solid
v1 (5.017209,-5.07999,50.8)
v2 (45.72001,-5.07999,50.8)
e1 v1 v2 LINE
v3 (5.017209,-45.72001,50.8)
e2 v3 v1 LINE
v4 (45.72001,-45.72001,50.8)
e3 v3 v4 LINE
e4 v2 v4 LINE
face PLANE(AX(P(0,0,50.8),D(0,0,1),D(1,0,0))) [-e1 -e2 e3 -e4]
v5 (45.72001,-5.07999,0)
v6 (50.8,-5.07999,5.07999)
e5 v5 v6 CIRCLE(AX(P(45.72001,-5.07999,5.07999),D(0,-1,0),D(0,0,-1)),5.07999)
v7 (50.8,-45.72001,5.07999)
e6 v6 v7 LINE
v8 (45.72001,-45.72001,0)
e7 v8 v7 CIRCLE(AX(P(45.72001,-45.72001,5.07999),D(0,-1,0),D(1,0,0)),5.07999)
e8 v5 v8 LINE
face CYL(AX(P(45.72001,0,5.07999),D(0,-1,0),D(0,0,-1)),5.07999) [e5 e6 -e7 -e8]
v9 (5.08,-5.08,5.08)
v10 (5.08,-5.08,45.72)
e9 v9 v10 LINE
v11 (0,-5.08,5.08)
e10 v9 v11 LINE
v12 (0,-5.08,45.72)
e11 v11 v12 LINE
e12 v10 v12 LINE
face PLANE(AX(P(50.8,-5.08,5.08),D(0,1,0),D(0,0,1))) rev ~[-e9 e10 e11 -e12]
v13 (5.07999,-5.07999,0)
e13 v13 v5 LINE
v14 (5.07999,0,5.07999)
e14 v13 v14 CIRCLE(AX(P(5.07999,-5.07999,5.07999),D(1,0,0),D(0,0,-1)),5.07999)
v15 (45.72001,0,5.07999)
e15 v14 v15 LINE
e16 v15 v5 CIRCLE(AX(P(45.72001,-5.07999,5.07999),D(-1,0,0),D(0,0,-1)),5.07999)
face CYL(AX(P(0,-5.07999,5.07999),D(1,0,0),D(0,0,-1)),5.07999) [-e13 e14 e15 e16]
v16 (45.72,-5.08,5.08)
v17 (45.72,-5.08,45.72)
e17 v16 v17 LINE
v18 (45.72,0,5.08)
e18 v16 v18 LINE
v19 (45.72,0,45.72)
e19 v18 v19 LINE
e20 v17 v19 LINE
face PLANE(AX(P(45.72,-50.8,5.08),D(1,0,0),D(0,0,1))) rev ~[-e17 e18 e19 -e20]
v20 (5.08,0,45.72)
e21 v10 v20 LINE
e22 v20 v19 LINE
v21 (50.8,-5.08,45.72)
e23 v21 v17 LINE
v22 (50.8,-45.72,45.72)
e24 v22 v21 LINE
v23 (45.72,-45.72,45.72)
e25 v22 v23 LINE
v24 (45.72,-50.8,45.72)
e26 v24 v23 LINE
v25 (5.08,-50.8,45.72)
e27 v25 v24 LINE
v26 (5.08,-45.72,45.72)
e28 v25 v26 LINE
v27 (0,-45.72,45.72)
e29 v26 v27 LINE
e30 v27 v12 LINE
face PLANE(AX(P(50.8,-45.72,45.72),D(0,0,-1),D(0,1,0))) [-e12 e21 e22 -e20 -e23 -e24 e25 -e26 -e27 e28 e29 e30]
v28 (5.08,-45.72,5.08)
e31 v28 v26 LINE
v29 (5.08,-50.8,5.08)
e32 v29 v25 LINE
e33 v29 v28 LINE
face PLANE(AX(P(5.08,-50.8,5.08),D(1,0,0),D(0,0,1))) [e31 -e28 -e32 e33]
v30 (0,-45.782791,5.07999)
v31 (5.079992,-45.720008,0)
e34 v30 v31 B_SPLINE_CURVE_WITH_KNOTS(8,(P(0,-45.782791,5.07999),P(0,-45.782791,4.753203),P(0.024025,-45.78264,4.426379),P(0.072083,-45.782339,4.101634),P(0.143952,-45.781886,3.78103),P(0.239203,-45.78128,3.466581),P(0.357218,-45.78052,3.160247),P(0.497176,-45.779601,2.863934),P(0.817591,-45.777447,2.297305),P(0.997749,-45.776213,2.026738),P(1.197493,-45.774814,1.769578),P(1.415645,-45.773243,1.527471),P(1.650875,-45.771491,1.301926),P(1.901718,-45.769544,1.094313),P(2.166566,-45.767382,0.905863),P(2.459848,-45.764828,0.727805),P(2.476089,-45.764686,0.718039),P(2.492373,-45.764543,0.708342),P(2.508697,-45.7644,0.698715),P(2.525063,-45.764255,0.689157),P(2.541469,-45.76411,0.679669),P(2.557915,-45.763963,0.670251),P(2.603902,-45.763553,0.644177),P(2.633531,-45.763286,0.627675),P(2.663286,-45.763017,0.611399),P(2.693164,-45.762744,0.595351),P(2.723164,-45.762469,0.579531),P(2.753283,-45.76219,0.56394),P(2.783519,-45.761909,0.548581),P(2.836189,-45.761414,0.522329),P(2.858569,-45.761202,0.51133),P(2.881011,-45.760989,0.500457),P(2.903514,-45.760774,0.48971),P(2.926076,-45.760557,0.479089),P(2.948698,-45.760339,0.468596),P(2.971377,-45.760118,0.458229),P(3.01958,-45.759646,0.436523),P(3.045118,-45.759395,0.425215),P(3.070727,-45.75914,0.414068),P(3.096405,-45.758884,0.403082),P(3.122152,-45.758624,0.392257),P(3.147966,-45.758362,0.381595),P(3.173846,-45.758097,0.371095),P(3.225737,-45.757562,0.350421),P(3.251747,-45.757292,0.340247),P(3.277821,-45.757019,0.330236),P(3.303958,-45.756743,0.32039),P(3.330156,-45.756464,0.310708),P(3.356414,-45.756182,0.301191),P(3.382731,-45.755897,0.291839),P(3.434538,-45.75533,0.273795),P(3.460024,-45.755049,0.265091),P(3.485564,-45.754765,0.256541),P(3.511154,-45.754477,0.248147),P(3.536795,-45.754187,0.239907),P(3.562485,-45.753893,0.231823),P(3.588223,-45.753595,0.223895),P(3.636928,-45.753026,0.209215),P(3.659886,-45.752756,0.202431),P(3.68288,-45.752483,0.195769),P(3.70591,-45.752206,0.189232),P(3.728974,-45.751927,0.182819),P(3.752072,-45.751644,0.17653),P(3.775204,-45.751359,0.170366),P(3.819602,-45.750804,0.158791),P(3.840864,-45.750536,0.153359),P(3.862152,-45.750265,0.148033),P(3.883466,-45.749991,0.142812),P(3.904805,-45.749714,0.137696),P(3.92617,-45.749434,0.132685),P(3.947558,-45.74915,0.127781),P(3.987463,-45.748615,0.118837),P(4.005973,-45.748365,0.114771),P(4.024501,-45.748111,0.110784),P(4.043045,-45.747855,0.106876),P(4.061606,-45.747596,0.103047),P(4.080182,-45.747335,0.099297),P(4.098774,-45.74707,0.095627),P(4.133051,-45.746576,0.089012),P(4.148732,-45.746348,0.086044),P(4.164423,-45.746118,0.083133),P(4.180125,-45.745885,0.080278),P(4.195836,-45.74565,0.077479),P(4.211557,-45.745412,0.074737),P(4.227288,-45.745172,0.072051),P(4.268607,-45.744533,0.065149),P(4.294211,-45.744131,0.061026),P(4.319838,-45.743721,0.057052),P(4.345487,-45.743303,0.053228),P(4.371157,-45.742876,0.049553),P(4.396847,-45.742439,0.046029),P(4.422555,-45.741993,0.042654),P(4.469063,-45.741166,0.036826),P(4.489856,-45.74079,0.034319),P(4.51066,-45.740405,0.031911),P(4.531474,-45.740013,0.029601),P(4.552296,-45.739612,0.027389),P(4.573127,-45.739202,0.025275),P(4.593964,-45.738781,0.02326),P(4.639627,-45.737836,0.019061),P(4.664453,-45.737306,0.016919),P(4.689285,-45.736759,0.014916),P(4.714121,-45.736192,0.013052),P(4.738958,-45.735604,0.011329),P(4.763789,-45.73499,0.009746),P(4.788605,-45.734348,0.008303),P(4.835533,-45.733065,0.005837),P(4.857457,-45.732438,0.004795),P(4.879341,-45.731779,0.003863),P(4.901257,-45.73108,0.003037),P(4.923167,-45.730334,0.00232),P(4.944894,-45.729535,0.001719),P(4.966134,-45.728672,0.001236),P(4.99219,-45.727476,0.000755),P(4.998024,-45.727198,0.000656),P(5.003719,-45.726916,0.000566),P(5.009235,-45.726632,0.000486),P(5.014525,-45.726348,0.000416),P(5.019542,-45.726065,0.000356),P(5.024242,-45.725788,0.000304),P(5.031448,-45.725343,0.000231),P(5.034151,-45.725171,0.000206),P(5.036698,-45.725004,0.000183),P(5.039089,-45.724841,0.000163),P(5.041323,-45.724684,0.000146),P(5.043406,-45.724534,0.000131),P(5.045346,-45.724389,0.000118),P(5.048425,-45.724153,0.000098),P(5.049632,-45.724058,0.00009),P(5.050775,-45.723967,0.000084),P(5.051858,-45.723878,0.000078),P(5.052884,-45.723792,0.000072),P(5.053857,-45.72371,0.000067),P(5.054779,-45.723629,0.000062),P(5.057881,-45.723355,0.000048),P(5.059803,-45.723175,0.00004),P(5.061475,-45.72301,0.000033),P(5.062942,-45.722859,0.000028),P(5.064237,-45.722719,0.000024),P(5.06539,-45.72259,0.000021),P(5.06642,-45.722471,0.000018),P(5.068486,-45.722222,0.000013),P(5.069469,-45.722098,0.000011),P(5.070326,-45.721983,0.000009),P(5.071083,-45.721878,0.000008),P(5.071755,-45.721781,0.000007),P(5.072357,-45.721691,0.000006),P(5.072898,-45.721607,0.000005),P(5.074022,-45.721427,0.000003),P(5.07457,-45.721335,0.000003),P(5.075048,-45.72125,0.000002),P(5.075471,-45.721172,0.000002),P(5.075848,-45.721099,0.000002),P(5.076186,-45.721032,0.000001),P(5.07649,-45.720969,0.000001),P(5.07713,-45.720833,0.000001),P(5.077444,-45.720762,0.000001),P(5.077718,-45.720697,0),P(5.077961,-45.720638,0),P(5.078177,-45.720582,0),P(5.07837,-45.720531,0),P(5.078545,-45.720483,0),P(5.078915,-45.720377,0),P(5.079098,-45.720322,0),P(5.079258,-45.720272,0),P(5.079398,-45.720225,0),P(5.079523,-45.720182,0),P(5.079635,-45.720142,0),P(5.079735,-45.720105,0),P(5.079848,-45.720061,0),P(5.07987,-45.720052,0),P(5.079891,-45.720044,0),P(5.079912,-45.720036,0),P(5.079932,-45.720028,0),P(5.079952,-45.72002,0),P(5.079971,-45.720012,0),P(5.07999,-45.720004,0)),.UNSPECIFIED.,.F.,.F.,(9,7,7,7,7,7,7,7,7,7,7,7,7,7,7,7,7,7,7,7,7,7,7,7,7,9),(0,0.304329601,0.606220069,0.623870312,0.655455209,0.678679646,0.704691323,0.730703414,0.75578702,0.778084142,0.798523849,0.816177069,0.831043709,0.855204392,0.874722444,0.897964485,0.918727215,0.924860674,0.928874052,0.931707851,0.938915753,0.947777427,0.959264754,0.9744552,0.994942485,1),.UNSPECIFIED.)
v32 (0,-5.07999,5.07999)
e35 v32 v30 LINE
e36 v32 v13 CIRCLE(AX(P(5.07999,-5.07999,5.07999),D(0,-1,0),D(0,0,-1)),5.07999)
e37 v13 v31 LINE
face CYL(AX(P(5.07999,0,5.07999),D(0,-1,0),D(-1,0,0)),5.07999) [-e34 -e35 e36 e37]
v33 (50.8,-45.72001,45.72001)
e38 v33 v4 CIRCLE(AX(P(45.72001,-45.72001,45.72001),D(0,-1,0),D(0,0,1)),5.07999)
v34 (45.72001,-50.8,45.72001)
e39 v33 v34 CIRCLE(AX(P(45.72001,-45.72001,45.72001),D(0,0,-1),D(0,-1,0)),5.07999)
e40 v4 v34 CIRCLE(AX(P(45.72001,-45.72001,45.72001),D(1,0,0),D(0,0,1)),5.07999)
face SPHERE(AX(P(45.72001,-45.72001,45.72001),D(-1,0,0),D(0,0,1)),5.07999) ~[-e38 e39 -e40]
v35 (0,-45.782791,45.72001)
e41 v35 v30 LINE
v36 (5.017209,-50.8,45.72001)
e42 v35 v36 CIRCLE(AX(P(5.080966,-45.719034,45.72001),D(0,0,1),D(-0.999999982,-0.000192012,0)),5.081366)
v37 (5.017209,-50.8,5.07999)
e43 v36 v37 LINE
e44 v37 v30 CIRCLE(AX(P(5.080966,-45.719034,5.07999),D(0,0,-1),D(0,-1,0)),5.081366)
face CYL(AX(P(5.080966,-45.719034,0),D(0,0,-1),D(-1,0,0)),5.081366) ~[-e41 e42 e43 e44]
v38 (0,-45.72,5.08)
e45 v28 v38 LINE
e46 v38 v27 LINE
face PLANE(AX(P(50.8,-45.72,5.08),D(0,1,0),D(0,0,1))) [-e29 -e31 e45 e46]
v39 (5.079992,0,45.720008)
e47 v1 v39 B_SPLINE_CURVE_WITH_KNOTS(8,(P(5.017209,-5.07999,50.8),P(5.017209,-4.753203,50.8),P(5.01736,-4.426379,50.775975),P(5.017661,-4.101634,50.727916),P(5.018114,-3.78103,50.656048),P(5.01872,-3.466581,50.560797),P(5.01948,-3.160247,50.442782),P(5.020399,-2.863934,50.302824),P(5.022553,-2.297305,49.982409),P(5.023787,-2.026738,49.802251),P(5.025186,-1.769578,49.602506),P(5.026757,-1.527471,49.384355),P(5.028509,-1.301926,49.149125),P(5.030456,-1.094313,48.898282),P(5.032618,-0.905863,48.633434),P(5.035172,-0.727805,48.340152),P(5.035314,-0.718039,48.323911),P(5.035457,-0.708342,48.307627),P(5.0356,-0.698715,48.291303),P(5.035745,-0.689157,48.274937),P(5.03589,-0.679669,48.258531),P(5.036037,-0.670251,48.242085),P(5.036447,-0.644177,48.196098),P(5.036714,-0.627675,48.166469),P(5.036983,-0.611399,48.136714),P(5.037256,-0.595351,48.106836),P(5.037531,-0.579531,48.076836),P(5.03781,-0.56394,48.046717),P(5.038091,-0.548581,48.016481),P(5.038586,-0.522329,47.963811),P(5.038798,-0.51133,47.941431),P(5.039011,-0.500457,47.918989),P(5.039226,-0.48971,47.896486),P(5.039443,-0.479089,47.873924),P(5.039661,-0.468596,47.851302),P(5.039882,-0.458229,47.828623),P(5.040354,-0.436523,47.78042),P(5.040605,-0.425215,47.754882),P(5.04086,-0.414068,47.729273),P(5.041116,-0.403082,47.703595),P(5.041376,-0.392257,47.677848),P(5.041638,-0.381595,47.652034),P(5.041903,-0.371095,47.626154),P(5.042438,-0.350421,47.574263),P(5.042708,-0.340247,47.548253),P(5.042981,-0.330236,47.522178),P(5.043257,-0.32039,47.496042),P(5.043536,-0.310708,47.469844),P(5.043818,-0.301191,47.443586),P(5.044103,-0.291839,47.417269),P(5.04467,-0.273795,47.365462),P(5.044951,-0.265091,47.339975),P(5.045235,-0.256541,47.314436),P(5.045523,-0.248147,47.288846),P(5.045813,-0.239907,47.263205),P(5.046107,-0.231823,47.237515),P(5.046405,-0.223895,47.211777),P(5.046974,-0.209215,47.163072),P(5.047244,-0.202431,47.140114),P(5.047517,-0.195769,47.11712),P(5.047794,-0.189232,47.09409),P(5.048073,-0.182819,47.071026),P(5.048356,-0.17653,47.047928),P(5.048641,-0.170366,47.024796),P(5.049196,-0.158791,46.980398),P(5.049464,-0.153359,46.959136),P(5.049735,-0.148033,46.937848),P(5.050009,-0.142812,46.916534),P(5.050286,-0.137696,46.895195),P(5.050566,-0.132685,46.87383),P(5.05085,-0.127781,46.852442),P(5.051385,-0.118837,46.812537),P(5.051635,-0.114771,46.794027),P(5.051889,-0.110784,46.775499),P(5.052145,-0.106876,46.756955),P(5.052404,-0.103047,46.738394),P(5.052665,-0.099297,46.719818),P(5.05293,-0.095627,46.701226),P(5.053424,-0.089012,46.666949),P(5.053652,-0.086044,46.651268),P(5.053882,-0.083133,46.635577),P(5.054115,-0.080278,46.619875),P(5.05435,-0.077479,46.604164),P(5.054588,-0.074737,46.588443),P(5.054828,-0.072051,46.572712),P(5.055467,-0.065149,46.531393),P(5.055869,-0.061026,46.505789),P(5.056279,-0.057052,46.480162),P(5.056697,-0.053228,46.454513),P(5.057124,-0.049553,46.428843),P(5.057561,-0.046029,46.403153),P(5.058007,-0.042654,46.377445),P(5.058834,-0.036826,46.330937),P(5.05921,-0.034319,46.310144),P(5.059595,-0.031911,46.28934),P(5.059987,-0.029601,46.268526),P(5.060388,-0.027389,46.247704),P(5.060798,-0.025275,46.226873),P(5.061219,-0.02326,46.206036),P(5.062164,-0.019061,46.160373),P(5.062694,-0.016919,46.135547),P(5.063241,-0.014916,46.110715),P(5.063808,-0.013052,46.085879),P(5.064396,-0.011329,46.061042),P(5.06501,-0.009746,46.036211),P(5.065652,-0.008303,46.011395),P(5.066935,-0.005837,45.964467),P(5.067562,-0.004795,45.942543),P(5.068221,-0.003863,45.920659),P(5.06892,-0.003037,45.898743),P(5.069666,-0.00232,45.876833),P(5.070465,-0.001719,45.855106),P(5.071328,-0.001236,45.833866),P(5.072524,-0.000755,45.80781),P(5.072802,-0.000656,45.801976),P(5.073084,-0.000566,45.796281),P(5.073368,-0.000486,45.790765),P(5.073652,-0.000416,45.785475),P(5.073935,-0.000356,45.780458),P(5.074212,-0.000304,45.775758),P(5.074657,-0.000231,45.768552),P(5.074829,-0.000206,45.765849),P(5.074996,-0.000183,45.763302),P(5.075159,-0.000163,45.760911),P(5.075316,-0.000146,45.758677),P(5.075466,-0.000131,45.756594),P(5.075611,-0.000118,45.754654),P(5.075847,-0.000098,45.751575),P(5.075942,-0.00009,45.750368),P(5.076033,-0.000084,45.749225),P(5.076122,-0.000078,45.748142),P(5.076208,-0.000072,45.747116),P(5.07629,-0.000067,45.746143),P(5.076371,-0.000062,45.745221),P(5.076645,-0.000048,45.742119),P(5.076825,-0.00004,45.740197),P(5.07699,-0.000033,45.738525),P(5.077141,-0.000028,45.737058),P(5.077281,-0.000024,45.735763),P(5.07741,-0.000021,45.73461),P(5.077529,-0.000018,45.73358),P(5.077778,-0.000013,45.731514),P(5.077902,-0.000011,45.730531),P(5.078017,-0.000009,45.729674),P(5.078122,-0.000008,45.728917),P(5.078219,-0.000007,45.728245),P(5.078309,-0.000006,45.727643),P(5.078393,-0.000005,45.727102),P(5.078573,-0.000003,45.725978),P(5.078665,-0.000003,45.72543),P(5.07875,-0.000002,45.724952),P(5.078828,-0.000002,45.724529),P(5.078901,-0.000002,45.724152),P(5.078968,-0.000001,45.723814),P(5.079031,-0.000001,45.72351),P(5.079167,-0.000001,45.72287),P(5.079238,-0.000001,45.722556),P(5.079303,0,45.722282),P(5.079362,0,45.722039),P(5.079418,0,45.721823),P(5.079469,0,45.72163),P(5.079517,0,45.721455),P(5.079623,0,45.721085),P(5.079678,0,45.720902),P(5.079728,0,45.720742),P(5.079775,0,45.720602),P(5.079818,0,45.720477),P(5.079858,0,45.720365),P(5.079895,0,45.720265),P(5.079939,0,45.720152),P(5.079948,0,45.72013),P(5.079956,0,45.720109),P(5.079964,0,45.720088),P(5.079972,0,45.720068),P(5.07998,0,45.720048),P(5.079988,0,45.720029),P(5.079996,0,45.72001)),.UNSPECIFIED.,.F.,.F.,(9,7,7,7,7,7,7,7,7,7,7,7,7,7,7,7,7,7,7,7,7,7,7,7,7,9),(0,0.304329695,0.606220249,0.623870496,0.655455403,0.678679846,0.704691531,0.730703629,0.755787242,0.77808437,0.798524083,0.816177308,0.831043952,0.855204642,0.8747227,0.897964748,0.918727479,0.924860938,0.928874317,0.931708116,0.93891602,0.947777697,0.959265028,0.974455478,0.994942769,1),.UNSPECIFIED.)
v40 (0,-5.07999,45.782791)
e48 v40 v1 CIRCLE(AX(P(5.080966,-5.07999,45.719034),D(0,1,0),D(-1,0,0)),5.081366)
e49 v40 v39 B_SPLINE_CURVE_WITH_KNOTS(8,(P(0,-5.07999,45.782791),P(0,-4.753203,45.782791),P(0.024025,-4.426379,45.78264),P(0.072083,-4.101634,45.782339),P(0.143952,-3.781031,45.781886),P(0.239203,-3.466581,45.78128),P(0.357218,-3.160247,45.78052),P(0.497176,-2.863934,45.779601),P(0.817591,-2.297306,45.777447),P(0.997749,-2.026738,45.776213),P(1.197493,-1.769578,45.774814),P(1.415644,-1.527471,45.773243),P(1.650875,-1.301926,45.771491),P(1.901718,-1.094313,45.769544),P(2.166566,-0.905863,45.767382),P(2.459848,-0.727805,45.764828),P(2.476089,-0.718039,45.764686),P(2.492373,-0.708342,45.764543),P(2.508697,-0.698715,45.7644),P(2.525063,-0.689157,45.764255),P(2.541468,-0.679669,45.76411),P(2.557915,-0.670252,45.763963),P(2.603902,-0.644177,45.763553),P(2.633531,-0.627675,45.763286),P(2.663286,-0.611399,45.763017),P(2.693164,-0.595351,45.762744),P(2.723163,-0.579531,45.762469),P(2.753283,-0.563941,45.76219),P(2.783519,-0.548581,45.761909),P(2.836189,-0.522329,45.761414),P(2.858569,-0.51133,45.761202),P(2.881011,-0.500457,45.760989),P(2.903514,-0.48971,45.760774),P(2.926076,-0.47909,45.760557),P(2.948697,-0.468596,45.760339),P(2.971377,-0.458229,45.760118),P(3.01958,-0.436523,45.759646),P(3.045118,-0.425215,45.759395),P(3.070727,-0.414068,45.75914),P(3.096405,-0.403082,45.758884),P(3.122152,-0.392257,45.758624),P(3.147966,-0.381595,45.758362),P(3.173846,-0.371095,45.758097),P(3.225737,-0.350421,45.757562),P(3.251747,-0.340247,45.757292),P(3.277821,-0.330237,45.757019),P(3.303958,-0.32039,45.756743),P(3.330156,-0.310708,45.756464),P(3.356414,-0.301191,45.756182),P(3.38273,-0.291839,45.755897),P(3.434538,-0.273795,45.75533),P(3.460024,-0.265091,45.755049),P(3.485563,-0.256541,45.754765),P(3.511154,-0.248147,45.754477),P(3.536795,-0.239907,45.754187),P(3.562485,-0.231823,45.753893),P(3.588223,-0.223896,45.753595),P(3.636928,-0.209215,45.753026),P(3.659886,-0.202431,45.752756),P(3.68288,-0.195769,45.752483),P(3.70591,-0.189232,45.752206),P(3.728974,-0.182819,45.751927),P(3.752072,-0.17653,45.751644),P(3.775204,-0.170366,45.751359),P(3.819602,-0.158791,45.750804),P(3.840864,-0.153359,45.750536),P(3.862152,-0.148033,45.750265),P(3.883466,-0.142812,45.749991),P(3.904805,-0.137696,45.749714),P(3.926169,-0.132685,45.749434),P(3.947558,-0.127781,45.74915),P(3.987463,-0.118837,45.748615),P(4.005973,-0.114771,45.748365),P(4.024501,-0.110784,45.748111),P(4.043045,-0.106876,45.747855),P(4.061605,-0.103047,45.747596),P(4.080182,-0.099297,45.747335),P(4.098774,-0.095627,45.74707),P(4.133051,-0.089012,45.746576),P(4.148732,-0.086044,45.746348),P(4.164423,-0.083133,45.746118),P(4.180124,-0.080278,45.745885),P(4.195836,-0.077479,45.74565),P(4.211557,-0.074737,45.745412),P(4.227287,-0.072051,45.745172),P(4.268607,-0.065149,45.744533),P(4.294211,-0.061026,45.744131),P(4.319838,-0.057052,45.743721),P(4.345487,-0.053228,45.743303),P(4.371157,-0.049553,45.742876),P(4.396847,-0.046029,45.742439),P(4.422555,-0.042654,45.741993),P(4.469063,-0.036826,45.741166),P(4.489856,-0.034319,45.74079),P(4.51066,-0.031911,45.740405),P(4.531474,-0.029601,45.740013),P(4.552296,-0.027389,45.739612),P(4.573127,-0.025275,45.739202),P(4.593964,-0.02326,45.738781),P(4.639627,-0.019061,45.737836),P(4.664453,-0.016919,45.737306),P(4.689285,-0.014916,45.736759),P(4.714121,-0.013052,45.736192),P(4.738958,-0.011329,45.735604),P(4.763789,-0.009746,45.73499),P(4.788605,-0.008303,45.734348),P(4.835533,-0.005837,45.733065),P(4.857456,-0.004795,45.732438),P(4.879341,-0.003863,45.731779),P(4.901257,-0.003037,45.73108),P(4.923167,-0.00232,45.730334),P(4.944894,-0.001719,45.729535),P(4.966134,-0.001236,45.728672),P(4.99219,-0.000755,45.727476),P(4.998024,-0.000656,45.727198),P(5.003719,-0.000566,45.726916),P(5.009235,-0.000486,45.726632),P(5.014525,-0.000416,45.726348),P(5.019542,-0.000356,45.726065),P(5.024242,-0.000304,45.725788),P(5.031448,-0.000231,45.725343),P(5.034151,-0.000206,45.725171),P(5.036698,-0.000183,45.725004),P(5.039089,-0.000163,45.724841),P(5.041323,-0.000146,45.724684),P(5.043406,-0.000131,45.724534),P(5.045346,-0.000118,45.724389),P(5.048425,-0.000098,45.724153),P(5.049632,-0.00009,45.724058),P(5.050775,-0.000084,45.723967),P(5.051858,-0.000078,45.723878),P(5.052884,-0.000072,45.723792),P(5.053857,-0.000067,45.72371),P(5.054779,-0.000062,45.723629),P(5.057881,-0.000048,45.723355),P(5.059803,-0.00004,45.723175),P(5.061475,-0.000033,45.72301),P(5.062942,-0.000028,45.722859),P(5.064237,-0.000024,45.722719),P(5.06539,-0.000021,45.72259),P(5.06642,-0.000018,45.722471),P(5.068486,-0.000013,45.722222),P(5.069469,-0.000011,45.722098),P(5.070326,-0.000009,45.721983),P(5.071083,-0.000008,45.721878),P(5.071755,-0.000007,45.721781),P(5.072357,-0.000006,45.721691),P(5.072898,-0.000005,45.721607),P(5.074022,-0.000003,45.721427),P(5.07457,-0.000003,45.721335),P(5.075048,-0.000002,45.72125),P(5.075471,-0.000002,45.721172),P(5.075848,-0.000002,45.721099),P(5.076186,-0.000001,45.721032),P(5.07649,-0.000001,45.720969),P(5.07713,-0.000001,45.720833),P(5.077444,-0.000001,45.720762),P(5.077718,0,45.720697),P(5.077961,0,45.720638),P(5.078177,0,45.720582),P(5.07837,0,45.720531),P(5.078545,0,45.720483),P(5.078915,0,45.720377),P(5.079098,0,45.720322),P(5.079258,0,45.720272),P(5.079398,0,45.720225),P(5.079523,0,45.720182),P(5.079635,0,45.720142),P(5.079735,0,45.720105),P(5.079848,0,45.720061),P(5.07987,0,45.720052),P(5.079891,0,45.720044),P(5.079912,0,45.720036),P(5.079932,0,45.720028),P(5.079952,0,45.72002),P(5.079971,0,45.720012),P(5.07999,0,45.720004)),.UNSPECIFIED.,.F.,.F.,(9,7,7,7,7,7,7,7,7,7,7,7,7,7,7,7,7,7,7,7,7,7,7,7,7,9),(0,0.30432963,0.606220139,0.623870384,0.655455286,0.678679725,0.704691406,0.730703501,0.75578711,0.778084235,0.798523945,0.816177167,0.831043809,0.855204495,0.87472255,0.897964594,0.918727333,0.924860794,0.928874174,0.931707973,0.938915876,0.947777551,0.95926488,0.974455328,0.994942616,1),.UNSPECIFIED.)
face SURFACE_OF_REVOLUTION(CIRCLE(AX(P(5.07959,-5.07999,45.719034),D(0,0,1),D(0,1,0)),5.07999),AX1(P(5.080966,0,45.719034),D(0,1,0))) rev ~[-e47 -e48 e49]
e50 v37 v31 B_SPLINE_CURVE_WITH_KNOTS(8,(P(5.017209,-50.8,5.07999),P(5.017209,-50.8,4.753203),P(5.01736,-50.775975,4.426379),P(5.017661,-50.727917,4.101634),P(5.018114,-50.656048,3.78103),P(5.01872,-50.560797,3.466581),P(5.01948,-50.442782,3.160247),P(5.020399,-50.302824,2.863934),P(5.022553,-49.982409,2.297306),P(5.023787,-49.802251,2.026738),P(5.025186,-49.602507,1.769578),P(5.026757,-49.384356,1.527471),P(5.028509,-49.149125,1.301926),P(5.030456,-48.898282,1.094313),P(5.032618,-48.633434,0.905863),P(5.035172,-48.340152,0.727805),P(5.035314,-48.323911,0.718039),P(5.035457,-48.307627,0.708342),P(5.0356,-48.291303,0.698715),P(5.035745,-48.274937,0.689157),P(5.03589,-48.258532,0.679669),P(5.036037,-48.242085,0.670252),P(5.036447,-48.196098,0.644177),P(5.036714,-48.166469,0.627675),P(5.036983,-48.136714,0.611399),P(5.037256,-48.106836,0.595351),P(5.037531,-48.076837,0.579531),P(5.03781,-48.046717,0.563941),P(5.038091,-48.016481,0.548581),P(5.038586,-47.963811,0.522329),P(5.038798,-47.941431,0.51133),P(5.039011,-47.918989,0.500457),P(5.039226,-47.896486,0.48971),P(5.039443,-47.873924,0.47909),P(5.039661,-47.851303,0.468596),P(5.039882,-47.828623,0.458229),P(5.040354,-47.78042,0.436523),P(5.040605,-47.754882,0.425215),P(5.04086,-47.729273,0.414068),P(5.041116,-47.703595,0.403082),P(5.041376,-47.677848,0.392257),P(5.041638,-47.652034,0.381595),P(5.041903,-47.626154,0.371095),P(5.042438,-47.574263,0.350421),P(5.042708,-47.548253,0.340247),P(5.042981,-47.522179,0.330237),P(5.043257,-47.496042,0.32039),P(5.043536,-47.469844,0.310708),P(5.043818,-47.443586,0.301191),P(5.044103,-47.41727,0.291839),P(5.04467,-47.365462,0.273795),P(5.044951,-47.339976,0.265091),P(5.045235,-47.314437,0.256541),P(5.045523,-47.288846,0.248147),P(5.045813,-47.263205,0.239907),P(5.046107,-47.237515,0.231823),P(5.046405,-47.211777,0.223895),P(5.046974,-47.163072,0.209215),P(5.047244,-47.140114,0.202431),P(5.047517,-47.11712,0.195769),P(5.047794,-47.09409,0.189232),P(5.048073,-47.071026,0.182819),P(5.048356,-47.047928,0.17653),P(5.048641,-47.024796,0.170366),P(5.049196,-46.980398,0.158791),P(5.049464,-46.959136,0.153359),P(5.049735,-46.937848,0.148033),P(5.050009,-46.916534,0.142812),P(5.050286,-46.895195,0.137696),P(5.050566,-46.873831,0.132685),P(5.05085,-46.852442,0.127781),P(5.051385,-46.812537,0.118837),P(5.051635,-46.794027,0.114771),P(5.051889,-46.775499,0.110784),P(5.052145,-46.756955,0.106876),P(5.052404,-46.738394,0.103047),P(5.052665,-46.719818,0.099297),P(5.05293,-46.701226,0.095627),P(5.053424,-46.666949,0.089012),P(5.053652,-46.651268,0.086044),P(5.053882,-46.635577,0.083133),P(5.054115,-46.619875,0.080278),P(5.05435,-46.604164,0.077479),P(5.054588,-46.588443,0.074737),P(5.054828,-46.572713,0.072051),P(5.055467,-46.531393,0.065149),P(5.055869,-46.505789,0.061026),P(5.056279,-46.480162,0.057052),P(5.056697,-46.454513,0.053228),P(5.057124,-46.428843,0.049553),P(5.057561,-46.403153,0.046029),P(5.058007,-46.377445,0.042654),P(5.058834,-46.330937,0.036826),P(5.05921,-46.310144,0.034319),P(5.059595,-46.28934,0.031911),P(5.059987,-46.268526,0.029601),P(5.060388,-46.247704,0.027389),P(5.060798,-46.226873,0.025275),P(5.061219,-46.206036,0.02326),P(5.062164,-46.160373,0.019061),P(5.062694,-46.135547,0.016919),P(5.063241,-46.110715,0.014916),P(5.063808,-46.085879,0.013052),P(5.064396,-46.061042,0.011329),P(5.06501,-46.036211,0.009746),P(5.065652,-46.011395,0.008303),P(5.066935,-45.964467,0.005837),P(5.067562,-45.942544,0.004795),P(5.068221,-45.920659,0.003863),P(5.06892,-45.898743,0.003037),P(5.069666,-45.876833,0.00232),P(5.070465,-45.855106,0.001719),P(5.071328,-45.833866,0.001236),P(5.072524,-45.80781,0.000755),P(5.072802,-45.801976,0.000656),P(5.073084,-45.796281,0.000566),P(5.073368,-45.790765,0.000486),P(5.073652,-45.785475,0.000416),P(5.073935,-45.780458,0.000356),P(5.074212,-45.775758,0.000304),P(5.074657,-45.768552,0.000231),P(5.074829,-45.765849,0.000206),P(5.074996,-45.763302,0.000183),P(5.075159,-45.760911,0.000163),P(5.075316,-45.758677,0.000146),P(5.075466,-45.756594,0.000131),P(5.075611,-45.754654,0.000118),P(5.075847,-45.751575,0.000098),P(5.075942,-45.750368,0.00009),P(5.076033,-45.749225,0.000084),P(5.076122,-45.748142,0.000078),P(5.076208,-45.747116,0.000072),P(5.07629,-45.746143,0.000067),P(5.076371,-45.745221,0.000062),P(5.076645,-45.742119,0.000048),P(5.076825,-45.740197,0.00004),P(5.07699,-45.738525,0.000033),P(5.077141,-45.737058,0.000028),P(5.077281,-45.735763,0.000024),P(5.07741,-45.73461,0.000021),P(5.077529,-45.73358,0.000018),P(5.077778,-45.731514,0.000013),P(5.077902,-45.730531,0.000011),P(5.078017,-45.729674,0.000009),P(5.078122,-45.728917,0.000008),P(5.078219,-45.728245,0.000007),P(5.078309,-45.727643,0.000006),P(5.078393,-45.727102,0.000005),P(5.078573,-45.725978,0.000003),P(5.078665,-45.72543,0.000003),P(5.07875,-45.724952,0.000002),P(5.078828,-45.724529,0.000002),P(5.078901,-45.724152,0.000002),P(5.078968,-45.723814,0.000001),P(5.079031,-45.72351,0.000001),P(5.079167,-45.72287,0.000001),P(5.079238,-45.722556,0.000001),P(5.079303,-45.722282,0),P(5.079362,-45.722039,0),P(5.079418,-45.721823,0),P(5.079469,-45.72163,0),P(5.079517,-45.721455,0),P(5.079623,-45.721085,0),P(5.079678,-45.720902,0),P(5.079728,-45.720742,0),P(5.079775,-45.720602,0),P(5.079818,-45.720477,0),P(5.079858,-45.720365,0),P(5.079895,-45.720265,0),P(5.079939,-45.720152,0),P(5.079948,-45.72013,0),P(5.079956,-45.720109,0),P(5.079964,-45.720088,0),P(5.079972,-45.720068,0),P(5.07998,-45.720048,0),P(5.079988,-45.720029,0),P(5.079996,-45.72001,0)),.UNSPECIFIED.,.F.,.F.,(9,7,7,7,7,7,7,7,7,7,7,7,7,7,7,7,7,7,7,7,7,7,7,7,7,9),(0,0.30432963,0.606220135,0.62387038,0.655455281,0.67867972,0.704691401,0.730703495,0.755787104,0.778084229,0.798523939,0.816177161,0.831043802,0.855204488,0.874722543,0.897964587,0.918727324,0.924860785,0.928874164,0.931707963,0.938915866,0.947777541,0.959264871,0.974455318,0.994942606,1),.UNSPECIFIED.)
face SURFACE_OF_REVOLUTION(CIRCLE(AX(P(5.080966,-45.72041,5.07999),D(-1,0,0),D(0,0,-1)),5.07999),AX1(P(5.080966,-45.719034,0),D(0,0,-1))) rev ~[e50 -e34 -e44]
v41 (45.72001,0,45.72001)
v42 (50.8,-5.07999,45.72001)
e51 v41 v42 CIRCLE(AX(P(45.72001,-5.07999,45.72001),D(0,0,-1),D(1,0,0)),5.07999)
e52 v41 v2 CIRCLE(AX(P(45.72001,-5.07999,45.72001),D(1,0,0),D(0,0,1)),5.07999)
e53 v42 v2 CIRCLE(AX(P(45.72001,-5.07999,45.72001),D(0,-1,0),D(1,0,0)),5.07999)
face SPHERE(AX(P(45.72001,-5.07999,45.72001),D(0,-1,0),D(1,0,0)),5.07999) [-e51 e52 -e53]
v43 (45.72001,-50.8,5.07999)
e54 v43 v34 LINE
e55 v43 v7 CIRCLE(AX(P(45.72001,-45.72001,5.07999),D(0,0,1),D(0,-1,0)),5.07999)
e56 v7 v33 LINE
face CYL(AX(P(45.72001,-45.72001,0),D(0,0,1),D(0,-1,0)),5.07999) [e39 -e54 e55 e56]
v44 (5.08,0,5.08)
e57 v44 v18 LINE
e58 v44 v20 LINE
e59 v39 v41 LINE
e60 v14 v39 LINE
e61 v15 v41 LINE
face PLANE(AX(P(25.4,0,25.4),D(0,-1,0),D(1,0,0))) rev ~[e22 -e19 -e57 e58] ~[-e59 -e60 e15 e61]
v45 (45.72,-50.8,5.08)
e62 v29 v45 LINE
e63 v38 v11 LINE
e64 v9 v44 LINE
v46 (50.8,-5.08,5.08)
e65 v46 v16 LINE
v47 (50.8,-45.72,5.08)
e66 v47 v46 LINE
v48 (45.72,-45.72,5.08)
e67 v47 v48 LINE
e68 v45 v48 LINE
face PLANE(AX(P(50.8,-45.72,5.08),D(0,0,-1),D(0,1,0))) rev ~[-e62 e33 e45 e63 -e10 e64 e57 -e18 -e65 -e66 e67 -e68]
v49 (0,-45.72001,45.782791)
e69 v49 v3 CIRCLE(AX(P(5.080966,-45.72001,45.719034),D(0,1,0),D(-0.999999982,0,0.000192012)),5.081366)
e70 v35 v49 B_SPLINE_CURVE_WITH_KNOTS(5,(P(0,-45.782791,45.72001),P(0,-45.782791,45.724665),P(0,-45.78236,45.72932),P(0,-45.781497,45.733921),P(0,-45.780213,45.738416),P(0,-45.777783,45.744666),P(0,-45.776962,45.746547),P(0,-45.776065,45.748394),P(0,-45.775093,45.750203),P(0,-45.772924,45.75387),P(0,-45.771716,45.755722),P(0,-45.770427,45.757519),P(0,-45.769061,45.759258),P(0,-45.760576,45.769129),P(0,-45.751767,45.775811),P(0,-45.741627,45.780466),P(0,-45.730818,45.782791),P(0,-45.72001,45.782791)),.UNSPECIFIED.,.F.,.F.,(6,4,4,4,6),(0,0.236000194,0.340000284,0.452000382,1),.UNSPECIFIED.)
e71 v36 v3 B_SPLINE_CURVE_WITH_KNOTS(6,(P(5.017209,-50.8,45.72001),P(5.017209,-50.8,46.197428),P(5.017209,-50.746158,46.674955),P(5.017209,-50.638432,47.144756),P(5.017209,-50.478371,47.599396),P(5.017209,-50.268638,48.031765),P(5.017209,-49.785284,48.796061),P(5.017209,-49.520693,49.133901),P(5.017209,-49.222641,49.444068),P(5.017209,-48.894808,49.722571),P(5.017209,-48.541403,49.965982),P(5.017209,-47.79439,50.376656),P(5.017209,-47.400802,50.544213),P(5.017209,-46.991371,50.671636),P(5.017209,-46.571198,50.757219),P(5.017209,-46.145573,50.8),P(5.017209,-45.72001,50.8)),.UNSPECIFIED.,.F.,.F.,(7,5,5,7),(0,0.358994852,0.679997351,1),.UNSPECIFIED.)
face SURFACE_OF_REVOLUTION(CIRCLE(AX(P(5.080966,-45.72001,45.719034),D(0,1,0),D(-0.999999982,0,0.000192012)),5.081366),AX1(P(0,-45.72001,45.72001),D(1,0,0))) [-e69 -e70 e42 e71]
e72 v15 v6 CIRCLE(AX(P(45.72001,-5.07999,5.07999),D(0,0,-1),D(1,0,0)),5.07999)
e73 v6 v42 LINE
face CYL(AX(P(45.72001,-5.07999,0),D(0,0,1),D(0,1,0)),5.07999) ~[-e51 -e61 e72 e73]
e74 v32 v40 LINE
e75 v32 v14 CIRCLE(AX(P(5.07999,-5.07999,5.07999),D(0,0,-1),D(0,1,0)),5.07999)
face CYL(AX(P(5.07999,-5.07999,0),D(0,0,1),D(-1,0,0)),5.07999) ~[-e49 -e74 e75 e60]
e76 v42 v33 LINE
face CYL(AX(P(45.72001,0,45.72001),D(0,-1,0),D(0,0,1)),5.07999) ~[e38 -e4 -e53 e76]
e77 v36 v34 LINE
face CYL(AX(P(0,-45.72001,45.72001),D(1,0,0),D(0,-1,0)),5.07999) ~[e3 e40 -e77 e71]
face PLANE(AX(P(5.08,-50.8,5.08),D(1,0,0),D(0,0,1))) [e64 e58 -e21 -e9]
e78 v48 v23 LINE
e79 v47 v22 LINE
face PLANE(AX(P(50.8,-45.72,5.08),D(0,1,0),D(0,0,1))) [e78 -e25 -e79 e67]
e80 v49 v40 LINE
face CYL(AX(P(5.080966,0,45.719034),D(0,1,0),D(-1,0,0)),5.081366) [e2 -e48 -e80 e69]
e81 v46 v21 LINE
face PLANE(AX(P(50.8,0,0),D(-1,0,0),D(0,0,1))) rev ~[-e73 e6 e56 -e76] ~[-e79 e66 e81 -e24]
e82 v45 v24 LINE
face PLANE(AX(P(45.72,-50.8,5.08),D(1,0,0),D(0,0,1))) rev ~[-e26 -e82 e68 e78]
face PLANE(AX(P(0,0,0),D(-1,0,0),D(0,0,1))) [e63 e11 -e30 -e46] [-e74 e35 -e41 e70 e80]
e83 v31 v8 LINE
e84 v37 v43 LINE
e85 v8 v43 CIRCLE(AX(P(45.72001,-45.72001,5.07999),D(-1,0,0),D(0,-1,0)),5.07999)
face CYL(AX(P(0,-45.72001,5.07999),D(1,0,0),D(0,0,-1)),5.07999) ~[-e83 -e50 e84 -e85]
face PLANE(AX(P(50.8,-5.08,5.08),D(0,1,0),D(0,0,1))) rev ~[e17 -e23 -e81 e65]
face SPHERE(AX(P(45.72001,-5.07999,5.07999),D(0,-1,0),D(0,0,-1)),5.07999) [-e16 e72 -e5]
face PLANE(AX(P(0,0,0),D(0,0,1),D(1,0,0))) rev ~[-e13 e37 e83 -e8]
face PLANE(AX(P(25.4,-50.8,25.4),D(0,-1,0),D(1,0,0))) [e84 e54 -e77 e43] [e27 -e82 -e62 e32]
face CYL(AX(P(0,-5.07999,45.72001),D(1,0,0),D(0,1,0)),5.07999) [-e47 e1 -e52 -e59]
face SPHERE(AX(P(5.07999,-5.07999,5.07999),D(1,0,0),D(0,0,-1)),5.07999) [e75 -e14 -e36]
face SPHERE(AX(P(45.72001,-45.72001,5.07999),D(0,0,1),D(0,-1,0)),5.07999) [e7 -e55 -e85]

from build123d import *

# Parameters (mm, degrees)
F0_W         = 50.8
F0_H         = 50.8
F1_DEPTH     = 50.8
F2_W         = 40.64
F2_H         = 40.64
F3_DEPTH     = 50.8
F4_W         = 40.64
F4_H         = 40.64
F5_DEPTH     = 50.8
F6_R         = 5.07999
F7_T1_DEPTH  = 58.4224242529
F7_T3_DEPTH  = 58.4224242529
F7_T6_ANGLE  = 90
F7_T8_ANGLE  = 90
F7_T10_ANGLE = 90


# Not quite as in the source:
# - a fillet or chamfer that OpenCascade refuses, or shapes differently, is made with other operations: its cross-section is extruded or revolved along the edge and cut away or added
# - a fillet or chamfer is up to 0.001 mm smaller than in the source, because OpenCascade refuses the exact size


with BuildPart() as f1:
    # F0 (on Front) → F1 (new body)
    with BuildSketch(Plane.XZ):
        with Locations((25.4, 25.4)):
            Rectangle(F0_W, F0_H)
    extrude(amount=F1_DEPTH)

    # F2 (on face) → F3 (cut)
    with BuildSketch(Plane.XZ.offset(50.8)):
        with Locations((25.4, 25.4)):
            Rectangle(F2_W, F2_H)
    extrude(amount=-F3_DEPTH, mode=Mode.SUBTRACT)

    # F4 (on face) → F5 (cut)
    with BuildSketch(Plane.YZ.offset(50.8)):
        with Locations((-25.4, 25.4)):
            Rectangle(F4_W, F4_H)
    extrude(amount=-F5_DEPTH, mode=Mode.SUBTRACT)

    # F6 (radius 5.08 in the source; OpenCascade refuses exactly that, so slightly less here)
    f6_edges = [f1.edges().sort_by_distance(p)[0] for p in [
        (25.4, -50.8, 50.8),
        (50.8, -25.4, 50.8),
        (50.8, -50.8, 25.4),
        (25.4, -50.8, 0),
        (50.8, -25.4, 0),
        (25.4, 0, 0),
        (0, -25.4, 0),
        (50.8, 0, 25.4),
        (25.4, 0, 50.8),
        (0, 0, 25.4),
    ]]
    fillet(f6_edges, radius=F6_R)

    # F7: fillet of radius 5.08 on 3 edges, made by hand

    # F7_s2 → F7_t1 (cut)
    with BuildSketch(Plane.XZ):
        with BuildLine():
            ThreePointArc((-0.0004, 45.7190343146), (1.4878975516, 49.3121024484), (5.0809656854, 50.8004))
            Line((5.0809656854, 50.8004), (5.0809656854, 51.3085365685))
            ThreePointArc((5.0809656854, 51.3085365685), (2.5404828427, 51.3081365685), (0, 51.3081365685))
            Line((0, 51.3081365685), (-0.5081365685, 50.8))
            ThreePointArc((-0.5081365685, 50.8), (-0.5081365685, 48.2595171573), (-0.5085365685, 45.7190343146))
            Line((-0.5085365685, 45.7190343146), (-0.0004, 45.7190343146))
        make_face()
    extrude(amount=F7_T1_DEPTH, mode=Mode.SUBTRACT)

    # F7_s4 → F7_t3 (cut)
    with BuildSketch(Plane.XY):
        with BuildLine():
            ThreePointArc((-0.0004, -45.7190343146), (1.4878975516, -49.3121024484), (5.0809656854, -50.8004))
            Line((5.0809656854, -50.8004), (5.0809656854, -51.3085365685))
            ThreePointArc((5.0809656854, -51.3085365685), (2.5404828427, -51.3081365685), (0, -51.3081365685))
            Line((0, -51.3081365685), (-0.5081365685, -50.8))
            ThreePointArc((-0.5081365685, -50.8), (-0.5081365685, -48.2595171573), (-0.5085365685, -45.7190343146))
            Line((-0.5085365685, -45.7190343146), (-0.0004, -45.7190343146))
        make_face()
    extrude(amount=F7_T3_DEPTH, mode=Mode.SUBTRACT)

    # F7_s5 → F7_t6 (revolve, cut)
    with BuildSketch(Plane.YZ.offset(5.0809656854)):
        with BuildLine():
            ThreePointArc((-45.72041, 0), (-49.3125053774, 1.4878946226), (-50.8004, 5.07999))
            Line((-50.8004, 5.07999), (-50.8004, 0))
            Line((-50.8004, 0), (-45.72041, 0))
        make_face()
    revolve(axis=Axis((5.0809656854, -45.7190343146, 0), (0, 0, -1)), revolution_arc=F7_T6_ANGLE, mode=Mode.SUBTRACT)

    # F7_s7 → F7_t8 (revolve, cut)
    with BuildSketch(Plane.XY.offset(45.7190343146)):
        with BuildLine():
            ThreePointArc((5.07959, 0), (1.4874946226, -1.4878946226), (-0.0004, -5.07999))
            Line((-0.0004, -5.07999), (-0.0004, 0))
            Line((-0.0004, 0), (5.07959, 0))
        make_face()
    revolve(axis=Axis((5.0809656854, 0, 45.7190343146), (0, 1, 0)), revolution_arc=F7_T8_ANGLE, mode=Mode.SUBTRACT)

    # F7_s9 → F7_t10 (revolve, cut)
    with BuildSketch(Plane.XZ.offset(45.72001)):
        with BuildLine():
            ThreePointArc((-0.0003999063, 45.72001), (1.488242525, 49.3124473888), (5.0809656854, 50.8004))
            Line((5.0809656854, 50.8004), (5.0809656854, 51.3085365685))
            ThreePointArc((5.0809656854, 51.3085365685), (2.5404828427, 51.3081365685), (0, 51.3081365685))
            Line((0, 51.3081365685), (-0.5081365685, 50.8))
            Line((-0.5081365685, 50.8), (-0.5085364917, 45.72001))
            Line((-0.5085364917, 45.72001), (-0.0003999063, 45.72001))
        make_face()
    revolve(axis=Axis((0, -45.72001, 45.72001), (1, 0, 0)), revolution_arc=F7_T10_ANGLE, mode=Mode.SUBTRACT)


solid = f1.part
